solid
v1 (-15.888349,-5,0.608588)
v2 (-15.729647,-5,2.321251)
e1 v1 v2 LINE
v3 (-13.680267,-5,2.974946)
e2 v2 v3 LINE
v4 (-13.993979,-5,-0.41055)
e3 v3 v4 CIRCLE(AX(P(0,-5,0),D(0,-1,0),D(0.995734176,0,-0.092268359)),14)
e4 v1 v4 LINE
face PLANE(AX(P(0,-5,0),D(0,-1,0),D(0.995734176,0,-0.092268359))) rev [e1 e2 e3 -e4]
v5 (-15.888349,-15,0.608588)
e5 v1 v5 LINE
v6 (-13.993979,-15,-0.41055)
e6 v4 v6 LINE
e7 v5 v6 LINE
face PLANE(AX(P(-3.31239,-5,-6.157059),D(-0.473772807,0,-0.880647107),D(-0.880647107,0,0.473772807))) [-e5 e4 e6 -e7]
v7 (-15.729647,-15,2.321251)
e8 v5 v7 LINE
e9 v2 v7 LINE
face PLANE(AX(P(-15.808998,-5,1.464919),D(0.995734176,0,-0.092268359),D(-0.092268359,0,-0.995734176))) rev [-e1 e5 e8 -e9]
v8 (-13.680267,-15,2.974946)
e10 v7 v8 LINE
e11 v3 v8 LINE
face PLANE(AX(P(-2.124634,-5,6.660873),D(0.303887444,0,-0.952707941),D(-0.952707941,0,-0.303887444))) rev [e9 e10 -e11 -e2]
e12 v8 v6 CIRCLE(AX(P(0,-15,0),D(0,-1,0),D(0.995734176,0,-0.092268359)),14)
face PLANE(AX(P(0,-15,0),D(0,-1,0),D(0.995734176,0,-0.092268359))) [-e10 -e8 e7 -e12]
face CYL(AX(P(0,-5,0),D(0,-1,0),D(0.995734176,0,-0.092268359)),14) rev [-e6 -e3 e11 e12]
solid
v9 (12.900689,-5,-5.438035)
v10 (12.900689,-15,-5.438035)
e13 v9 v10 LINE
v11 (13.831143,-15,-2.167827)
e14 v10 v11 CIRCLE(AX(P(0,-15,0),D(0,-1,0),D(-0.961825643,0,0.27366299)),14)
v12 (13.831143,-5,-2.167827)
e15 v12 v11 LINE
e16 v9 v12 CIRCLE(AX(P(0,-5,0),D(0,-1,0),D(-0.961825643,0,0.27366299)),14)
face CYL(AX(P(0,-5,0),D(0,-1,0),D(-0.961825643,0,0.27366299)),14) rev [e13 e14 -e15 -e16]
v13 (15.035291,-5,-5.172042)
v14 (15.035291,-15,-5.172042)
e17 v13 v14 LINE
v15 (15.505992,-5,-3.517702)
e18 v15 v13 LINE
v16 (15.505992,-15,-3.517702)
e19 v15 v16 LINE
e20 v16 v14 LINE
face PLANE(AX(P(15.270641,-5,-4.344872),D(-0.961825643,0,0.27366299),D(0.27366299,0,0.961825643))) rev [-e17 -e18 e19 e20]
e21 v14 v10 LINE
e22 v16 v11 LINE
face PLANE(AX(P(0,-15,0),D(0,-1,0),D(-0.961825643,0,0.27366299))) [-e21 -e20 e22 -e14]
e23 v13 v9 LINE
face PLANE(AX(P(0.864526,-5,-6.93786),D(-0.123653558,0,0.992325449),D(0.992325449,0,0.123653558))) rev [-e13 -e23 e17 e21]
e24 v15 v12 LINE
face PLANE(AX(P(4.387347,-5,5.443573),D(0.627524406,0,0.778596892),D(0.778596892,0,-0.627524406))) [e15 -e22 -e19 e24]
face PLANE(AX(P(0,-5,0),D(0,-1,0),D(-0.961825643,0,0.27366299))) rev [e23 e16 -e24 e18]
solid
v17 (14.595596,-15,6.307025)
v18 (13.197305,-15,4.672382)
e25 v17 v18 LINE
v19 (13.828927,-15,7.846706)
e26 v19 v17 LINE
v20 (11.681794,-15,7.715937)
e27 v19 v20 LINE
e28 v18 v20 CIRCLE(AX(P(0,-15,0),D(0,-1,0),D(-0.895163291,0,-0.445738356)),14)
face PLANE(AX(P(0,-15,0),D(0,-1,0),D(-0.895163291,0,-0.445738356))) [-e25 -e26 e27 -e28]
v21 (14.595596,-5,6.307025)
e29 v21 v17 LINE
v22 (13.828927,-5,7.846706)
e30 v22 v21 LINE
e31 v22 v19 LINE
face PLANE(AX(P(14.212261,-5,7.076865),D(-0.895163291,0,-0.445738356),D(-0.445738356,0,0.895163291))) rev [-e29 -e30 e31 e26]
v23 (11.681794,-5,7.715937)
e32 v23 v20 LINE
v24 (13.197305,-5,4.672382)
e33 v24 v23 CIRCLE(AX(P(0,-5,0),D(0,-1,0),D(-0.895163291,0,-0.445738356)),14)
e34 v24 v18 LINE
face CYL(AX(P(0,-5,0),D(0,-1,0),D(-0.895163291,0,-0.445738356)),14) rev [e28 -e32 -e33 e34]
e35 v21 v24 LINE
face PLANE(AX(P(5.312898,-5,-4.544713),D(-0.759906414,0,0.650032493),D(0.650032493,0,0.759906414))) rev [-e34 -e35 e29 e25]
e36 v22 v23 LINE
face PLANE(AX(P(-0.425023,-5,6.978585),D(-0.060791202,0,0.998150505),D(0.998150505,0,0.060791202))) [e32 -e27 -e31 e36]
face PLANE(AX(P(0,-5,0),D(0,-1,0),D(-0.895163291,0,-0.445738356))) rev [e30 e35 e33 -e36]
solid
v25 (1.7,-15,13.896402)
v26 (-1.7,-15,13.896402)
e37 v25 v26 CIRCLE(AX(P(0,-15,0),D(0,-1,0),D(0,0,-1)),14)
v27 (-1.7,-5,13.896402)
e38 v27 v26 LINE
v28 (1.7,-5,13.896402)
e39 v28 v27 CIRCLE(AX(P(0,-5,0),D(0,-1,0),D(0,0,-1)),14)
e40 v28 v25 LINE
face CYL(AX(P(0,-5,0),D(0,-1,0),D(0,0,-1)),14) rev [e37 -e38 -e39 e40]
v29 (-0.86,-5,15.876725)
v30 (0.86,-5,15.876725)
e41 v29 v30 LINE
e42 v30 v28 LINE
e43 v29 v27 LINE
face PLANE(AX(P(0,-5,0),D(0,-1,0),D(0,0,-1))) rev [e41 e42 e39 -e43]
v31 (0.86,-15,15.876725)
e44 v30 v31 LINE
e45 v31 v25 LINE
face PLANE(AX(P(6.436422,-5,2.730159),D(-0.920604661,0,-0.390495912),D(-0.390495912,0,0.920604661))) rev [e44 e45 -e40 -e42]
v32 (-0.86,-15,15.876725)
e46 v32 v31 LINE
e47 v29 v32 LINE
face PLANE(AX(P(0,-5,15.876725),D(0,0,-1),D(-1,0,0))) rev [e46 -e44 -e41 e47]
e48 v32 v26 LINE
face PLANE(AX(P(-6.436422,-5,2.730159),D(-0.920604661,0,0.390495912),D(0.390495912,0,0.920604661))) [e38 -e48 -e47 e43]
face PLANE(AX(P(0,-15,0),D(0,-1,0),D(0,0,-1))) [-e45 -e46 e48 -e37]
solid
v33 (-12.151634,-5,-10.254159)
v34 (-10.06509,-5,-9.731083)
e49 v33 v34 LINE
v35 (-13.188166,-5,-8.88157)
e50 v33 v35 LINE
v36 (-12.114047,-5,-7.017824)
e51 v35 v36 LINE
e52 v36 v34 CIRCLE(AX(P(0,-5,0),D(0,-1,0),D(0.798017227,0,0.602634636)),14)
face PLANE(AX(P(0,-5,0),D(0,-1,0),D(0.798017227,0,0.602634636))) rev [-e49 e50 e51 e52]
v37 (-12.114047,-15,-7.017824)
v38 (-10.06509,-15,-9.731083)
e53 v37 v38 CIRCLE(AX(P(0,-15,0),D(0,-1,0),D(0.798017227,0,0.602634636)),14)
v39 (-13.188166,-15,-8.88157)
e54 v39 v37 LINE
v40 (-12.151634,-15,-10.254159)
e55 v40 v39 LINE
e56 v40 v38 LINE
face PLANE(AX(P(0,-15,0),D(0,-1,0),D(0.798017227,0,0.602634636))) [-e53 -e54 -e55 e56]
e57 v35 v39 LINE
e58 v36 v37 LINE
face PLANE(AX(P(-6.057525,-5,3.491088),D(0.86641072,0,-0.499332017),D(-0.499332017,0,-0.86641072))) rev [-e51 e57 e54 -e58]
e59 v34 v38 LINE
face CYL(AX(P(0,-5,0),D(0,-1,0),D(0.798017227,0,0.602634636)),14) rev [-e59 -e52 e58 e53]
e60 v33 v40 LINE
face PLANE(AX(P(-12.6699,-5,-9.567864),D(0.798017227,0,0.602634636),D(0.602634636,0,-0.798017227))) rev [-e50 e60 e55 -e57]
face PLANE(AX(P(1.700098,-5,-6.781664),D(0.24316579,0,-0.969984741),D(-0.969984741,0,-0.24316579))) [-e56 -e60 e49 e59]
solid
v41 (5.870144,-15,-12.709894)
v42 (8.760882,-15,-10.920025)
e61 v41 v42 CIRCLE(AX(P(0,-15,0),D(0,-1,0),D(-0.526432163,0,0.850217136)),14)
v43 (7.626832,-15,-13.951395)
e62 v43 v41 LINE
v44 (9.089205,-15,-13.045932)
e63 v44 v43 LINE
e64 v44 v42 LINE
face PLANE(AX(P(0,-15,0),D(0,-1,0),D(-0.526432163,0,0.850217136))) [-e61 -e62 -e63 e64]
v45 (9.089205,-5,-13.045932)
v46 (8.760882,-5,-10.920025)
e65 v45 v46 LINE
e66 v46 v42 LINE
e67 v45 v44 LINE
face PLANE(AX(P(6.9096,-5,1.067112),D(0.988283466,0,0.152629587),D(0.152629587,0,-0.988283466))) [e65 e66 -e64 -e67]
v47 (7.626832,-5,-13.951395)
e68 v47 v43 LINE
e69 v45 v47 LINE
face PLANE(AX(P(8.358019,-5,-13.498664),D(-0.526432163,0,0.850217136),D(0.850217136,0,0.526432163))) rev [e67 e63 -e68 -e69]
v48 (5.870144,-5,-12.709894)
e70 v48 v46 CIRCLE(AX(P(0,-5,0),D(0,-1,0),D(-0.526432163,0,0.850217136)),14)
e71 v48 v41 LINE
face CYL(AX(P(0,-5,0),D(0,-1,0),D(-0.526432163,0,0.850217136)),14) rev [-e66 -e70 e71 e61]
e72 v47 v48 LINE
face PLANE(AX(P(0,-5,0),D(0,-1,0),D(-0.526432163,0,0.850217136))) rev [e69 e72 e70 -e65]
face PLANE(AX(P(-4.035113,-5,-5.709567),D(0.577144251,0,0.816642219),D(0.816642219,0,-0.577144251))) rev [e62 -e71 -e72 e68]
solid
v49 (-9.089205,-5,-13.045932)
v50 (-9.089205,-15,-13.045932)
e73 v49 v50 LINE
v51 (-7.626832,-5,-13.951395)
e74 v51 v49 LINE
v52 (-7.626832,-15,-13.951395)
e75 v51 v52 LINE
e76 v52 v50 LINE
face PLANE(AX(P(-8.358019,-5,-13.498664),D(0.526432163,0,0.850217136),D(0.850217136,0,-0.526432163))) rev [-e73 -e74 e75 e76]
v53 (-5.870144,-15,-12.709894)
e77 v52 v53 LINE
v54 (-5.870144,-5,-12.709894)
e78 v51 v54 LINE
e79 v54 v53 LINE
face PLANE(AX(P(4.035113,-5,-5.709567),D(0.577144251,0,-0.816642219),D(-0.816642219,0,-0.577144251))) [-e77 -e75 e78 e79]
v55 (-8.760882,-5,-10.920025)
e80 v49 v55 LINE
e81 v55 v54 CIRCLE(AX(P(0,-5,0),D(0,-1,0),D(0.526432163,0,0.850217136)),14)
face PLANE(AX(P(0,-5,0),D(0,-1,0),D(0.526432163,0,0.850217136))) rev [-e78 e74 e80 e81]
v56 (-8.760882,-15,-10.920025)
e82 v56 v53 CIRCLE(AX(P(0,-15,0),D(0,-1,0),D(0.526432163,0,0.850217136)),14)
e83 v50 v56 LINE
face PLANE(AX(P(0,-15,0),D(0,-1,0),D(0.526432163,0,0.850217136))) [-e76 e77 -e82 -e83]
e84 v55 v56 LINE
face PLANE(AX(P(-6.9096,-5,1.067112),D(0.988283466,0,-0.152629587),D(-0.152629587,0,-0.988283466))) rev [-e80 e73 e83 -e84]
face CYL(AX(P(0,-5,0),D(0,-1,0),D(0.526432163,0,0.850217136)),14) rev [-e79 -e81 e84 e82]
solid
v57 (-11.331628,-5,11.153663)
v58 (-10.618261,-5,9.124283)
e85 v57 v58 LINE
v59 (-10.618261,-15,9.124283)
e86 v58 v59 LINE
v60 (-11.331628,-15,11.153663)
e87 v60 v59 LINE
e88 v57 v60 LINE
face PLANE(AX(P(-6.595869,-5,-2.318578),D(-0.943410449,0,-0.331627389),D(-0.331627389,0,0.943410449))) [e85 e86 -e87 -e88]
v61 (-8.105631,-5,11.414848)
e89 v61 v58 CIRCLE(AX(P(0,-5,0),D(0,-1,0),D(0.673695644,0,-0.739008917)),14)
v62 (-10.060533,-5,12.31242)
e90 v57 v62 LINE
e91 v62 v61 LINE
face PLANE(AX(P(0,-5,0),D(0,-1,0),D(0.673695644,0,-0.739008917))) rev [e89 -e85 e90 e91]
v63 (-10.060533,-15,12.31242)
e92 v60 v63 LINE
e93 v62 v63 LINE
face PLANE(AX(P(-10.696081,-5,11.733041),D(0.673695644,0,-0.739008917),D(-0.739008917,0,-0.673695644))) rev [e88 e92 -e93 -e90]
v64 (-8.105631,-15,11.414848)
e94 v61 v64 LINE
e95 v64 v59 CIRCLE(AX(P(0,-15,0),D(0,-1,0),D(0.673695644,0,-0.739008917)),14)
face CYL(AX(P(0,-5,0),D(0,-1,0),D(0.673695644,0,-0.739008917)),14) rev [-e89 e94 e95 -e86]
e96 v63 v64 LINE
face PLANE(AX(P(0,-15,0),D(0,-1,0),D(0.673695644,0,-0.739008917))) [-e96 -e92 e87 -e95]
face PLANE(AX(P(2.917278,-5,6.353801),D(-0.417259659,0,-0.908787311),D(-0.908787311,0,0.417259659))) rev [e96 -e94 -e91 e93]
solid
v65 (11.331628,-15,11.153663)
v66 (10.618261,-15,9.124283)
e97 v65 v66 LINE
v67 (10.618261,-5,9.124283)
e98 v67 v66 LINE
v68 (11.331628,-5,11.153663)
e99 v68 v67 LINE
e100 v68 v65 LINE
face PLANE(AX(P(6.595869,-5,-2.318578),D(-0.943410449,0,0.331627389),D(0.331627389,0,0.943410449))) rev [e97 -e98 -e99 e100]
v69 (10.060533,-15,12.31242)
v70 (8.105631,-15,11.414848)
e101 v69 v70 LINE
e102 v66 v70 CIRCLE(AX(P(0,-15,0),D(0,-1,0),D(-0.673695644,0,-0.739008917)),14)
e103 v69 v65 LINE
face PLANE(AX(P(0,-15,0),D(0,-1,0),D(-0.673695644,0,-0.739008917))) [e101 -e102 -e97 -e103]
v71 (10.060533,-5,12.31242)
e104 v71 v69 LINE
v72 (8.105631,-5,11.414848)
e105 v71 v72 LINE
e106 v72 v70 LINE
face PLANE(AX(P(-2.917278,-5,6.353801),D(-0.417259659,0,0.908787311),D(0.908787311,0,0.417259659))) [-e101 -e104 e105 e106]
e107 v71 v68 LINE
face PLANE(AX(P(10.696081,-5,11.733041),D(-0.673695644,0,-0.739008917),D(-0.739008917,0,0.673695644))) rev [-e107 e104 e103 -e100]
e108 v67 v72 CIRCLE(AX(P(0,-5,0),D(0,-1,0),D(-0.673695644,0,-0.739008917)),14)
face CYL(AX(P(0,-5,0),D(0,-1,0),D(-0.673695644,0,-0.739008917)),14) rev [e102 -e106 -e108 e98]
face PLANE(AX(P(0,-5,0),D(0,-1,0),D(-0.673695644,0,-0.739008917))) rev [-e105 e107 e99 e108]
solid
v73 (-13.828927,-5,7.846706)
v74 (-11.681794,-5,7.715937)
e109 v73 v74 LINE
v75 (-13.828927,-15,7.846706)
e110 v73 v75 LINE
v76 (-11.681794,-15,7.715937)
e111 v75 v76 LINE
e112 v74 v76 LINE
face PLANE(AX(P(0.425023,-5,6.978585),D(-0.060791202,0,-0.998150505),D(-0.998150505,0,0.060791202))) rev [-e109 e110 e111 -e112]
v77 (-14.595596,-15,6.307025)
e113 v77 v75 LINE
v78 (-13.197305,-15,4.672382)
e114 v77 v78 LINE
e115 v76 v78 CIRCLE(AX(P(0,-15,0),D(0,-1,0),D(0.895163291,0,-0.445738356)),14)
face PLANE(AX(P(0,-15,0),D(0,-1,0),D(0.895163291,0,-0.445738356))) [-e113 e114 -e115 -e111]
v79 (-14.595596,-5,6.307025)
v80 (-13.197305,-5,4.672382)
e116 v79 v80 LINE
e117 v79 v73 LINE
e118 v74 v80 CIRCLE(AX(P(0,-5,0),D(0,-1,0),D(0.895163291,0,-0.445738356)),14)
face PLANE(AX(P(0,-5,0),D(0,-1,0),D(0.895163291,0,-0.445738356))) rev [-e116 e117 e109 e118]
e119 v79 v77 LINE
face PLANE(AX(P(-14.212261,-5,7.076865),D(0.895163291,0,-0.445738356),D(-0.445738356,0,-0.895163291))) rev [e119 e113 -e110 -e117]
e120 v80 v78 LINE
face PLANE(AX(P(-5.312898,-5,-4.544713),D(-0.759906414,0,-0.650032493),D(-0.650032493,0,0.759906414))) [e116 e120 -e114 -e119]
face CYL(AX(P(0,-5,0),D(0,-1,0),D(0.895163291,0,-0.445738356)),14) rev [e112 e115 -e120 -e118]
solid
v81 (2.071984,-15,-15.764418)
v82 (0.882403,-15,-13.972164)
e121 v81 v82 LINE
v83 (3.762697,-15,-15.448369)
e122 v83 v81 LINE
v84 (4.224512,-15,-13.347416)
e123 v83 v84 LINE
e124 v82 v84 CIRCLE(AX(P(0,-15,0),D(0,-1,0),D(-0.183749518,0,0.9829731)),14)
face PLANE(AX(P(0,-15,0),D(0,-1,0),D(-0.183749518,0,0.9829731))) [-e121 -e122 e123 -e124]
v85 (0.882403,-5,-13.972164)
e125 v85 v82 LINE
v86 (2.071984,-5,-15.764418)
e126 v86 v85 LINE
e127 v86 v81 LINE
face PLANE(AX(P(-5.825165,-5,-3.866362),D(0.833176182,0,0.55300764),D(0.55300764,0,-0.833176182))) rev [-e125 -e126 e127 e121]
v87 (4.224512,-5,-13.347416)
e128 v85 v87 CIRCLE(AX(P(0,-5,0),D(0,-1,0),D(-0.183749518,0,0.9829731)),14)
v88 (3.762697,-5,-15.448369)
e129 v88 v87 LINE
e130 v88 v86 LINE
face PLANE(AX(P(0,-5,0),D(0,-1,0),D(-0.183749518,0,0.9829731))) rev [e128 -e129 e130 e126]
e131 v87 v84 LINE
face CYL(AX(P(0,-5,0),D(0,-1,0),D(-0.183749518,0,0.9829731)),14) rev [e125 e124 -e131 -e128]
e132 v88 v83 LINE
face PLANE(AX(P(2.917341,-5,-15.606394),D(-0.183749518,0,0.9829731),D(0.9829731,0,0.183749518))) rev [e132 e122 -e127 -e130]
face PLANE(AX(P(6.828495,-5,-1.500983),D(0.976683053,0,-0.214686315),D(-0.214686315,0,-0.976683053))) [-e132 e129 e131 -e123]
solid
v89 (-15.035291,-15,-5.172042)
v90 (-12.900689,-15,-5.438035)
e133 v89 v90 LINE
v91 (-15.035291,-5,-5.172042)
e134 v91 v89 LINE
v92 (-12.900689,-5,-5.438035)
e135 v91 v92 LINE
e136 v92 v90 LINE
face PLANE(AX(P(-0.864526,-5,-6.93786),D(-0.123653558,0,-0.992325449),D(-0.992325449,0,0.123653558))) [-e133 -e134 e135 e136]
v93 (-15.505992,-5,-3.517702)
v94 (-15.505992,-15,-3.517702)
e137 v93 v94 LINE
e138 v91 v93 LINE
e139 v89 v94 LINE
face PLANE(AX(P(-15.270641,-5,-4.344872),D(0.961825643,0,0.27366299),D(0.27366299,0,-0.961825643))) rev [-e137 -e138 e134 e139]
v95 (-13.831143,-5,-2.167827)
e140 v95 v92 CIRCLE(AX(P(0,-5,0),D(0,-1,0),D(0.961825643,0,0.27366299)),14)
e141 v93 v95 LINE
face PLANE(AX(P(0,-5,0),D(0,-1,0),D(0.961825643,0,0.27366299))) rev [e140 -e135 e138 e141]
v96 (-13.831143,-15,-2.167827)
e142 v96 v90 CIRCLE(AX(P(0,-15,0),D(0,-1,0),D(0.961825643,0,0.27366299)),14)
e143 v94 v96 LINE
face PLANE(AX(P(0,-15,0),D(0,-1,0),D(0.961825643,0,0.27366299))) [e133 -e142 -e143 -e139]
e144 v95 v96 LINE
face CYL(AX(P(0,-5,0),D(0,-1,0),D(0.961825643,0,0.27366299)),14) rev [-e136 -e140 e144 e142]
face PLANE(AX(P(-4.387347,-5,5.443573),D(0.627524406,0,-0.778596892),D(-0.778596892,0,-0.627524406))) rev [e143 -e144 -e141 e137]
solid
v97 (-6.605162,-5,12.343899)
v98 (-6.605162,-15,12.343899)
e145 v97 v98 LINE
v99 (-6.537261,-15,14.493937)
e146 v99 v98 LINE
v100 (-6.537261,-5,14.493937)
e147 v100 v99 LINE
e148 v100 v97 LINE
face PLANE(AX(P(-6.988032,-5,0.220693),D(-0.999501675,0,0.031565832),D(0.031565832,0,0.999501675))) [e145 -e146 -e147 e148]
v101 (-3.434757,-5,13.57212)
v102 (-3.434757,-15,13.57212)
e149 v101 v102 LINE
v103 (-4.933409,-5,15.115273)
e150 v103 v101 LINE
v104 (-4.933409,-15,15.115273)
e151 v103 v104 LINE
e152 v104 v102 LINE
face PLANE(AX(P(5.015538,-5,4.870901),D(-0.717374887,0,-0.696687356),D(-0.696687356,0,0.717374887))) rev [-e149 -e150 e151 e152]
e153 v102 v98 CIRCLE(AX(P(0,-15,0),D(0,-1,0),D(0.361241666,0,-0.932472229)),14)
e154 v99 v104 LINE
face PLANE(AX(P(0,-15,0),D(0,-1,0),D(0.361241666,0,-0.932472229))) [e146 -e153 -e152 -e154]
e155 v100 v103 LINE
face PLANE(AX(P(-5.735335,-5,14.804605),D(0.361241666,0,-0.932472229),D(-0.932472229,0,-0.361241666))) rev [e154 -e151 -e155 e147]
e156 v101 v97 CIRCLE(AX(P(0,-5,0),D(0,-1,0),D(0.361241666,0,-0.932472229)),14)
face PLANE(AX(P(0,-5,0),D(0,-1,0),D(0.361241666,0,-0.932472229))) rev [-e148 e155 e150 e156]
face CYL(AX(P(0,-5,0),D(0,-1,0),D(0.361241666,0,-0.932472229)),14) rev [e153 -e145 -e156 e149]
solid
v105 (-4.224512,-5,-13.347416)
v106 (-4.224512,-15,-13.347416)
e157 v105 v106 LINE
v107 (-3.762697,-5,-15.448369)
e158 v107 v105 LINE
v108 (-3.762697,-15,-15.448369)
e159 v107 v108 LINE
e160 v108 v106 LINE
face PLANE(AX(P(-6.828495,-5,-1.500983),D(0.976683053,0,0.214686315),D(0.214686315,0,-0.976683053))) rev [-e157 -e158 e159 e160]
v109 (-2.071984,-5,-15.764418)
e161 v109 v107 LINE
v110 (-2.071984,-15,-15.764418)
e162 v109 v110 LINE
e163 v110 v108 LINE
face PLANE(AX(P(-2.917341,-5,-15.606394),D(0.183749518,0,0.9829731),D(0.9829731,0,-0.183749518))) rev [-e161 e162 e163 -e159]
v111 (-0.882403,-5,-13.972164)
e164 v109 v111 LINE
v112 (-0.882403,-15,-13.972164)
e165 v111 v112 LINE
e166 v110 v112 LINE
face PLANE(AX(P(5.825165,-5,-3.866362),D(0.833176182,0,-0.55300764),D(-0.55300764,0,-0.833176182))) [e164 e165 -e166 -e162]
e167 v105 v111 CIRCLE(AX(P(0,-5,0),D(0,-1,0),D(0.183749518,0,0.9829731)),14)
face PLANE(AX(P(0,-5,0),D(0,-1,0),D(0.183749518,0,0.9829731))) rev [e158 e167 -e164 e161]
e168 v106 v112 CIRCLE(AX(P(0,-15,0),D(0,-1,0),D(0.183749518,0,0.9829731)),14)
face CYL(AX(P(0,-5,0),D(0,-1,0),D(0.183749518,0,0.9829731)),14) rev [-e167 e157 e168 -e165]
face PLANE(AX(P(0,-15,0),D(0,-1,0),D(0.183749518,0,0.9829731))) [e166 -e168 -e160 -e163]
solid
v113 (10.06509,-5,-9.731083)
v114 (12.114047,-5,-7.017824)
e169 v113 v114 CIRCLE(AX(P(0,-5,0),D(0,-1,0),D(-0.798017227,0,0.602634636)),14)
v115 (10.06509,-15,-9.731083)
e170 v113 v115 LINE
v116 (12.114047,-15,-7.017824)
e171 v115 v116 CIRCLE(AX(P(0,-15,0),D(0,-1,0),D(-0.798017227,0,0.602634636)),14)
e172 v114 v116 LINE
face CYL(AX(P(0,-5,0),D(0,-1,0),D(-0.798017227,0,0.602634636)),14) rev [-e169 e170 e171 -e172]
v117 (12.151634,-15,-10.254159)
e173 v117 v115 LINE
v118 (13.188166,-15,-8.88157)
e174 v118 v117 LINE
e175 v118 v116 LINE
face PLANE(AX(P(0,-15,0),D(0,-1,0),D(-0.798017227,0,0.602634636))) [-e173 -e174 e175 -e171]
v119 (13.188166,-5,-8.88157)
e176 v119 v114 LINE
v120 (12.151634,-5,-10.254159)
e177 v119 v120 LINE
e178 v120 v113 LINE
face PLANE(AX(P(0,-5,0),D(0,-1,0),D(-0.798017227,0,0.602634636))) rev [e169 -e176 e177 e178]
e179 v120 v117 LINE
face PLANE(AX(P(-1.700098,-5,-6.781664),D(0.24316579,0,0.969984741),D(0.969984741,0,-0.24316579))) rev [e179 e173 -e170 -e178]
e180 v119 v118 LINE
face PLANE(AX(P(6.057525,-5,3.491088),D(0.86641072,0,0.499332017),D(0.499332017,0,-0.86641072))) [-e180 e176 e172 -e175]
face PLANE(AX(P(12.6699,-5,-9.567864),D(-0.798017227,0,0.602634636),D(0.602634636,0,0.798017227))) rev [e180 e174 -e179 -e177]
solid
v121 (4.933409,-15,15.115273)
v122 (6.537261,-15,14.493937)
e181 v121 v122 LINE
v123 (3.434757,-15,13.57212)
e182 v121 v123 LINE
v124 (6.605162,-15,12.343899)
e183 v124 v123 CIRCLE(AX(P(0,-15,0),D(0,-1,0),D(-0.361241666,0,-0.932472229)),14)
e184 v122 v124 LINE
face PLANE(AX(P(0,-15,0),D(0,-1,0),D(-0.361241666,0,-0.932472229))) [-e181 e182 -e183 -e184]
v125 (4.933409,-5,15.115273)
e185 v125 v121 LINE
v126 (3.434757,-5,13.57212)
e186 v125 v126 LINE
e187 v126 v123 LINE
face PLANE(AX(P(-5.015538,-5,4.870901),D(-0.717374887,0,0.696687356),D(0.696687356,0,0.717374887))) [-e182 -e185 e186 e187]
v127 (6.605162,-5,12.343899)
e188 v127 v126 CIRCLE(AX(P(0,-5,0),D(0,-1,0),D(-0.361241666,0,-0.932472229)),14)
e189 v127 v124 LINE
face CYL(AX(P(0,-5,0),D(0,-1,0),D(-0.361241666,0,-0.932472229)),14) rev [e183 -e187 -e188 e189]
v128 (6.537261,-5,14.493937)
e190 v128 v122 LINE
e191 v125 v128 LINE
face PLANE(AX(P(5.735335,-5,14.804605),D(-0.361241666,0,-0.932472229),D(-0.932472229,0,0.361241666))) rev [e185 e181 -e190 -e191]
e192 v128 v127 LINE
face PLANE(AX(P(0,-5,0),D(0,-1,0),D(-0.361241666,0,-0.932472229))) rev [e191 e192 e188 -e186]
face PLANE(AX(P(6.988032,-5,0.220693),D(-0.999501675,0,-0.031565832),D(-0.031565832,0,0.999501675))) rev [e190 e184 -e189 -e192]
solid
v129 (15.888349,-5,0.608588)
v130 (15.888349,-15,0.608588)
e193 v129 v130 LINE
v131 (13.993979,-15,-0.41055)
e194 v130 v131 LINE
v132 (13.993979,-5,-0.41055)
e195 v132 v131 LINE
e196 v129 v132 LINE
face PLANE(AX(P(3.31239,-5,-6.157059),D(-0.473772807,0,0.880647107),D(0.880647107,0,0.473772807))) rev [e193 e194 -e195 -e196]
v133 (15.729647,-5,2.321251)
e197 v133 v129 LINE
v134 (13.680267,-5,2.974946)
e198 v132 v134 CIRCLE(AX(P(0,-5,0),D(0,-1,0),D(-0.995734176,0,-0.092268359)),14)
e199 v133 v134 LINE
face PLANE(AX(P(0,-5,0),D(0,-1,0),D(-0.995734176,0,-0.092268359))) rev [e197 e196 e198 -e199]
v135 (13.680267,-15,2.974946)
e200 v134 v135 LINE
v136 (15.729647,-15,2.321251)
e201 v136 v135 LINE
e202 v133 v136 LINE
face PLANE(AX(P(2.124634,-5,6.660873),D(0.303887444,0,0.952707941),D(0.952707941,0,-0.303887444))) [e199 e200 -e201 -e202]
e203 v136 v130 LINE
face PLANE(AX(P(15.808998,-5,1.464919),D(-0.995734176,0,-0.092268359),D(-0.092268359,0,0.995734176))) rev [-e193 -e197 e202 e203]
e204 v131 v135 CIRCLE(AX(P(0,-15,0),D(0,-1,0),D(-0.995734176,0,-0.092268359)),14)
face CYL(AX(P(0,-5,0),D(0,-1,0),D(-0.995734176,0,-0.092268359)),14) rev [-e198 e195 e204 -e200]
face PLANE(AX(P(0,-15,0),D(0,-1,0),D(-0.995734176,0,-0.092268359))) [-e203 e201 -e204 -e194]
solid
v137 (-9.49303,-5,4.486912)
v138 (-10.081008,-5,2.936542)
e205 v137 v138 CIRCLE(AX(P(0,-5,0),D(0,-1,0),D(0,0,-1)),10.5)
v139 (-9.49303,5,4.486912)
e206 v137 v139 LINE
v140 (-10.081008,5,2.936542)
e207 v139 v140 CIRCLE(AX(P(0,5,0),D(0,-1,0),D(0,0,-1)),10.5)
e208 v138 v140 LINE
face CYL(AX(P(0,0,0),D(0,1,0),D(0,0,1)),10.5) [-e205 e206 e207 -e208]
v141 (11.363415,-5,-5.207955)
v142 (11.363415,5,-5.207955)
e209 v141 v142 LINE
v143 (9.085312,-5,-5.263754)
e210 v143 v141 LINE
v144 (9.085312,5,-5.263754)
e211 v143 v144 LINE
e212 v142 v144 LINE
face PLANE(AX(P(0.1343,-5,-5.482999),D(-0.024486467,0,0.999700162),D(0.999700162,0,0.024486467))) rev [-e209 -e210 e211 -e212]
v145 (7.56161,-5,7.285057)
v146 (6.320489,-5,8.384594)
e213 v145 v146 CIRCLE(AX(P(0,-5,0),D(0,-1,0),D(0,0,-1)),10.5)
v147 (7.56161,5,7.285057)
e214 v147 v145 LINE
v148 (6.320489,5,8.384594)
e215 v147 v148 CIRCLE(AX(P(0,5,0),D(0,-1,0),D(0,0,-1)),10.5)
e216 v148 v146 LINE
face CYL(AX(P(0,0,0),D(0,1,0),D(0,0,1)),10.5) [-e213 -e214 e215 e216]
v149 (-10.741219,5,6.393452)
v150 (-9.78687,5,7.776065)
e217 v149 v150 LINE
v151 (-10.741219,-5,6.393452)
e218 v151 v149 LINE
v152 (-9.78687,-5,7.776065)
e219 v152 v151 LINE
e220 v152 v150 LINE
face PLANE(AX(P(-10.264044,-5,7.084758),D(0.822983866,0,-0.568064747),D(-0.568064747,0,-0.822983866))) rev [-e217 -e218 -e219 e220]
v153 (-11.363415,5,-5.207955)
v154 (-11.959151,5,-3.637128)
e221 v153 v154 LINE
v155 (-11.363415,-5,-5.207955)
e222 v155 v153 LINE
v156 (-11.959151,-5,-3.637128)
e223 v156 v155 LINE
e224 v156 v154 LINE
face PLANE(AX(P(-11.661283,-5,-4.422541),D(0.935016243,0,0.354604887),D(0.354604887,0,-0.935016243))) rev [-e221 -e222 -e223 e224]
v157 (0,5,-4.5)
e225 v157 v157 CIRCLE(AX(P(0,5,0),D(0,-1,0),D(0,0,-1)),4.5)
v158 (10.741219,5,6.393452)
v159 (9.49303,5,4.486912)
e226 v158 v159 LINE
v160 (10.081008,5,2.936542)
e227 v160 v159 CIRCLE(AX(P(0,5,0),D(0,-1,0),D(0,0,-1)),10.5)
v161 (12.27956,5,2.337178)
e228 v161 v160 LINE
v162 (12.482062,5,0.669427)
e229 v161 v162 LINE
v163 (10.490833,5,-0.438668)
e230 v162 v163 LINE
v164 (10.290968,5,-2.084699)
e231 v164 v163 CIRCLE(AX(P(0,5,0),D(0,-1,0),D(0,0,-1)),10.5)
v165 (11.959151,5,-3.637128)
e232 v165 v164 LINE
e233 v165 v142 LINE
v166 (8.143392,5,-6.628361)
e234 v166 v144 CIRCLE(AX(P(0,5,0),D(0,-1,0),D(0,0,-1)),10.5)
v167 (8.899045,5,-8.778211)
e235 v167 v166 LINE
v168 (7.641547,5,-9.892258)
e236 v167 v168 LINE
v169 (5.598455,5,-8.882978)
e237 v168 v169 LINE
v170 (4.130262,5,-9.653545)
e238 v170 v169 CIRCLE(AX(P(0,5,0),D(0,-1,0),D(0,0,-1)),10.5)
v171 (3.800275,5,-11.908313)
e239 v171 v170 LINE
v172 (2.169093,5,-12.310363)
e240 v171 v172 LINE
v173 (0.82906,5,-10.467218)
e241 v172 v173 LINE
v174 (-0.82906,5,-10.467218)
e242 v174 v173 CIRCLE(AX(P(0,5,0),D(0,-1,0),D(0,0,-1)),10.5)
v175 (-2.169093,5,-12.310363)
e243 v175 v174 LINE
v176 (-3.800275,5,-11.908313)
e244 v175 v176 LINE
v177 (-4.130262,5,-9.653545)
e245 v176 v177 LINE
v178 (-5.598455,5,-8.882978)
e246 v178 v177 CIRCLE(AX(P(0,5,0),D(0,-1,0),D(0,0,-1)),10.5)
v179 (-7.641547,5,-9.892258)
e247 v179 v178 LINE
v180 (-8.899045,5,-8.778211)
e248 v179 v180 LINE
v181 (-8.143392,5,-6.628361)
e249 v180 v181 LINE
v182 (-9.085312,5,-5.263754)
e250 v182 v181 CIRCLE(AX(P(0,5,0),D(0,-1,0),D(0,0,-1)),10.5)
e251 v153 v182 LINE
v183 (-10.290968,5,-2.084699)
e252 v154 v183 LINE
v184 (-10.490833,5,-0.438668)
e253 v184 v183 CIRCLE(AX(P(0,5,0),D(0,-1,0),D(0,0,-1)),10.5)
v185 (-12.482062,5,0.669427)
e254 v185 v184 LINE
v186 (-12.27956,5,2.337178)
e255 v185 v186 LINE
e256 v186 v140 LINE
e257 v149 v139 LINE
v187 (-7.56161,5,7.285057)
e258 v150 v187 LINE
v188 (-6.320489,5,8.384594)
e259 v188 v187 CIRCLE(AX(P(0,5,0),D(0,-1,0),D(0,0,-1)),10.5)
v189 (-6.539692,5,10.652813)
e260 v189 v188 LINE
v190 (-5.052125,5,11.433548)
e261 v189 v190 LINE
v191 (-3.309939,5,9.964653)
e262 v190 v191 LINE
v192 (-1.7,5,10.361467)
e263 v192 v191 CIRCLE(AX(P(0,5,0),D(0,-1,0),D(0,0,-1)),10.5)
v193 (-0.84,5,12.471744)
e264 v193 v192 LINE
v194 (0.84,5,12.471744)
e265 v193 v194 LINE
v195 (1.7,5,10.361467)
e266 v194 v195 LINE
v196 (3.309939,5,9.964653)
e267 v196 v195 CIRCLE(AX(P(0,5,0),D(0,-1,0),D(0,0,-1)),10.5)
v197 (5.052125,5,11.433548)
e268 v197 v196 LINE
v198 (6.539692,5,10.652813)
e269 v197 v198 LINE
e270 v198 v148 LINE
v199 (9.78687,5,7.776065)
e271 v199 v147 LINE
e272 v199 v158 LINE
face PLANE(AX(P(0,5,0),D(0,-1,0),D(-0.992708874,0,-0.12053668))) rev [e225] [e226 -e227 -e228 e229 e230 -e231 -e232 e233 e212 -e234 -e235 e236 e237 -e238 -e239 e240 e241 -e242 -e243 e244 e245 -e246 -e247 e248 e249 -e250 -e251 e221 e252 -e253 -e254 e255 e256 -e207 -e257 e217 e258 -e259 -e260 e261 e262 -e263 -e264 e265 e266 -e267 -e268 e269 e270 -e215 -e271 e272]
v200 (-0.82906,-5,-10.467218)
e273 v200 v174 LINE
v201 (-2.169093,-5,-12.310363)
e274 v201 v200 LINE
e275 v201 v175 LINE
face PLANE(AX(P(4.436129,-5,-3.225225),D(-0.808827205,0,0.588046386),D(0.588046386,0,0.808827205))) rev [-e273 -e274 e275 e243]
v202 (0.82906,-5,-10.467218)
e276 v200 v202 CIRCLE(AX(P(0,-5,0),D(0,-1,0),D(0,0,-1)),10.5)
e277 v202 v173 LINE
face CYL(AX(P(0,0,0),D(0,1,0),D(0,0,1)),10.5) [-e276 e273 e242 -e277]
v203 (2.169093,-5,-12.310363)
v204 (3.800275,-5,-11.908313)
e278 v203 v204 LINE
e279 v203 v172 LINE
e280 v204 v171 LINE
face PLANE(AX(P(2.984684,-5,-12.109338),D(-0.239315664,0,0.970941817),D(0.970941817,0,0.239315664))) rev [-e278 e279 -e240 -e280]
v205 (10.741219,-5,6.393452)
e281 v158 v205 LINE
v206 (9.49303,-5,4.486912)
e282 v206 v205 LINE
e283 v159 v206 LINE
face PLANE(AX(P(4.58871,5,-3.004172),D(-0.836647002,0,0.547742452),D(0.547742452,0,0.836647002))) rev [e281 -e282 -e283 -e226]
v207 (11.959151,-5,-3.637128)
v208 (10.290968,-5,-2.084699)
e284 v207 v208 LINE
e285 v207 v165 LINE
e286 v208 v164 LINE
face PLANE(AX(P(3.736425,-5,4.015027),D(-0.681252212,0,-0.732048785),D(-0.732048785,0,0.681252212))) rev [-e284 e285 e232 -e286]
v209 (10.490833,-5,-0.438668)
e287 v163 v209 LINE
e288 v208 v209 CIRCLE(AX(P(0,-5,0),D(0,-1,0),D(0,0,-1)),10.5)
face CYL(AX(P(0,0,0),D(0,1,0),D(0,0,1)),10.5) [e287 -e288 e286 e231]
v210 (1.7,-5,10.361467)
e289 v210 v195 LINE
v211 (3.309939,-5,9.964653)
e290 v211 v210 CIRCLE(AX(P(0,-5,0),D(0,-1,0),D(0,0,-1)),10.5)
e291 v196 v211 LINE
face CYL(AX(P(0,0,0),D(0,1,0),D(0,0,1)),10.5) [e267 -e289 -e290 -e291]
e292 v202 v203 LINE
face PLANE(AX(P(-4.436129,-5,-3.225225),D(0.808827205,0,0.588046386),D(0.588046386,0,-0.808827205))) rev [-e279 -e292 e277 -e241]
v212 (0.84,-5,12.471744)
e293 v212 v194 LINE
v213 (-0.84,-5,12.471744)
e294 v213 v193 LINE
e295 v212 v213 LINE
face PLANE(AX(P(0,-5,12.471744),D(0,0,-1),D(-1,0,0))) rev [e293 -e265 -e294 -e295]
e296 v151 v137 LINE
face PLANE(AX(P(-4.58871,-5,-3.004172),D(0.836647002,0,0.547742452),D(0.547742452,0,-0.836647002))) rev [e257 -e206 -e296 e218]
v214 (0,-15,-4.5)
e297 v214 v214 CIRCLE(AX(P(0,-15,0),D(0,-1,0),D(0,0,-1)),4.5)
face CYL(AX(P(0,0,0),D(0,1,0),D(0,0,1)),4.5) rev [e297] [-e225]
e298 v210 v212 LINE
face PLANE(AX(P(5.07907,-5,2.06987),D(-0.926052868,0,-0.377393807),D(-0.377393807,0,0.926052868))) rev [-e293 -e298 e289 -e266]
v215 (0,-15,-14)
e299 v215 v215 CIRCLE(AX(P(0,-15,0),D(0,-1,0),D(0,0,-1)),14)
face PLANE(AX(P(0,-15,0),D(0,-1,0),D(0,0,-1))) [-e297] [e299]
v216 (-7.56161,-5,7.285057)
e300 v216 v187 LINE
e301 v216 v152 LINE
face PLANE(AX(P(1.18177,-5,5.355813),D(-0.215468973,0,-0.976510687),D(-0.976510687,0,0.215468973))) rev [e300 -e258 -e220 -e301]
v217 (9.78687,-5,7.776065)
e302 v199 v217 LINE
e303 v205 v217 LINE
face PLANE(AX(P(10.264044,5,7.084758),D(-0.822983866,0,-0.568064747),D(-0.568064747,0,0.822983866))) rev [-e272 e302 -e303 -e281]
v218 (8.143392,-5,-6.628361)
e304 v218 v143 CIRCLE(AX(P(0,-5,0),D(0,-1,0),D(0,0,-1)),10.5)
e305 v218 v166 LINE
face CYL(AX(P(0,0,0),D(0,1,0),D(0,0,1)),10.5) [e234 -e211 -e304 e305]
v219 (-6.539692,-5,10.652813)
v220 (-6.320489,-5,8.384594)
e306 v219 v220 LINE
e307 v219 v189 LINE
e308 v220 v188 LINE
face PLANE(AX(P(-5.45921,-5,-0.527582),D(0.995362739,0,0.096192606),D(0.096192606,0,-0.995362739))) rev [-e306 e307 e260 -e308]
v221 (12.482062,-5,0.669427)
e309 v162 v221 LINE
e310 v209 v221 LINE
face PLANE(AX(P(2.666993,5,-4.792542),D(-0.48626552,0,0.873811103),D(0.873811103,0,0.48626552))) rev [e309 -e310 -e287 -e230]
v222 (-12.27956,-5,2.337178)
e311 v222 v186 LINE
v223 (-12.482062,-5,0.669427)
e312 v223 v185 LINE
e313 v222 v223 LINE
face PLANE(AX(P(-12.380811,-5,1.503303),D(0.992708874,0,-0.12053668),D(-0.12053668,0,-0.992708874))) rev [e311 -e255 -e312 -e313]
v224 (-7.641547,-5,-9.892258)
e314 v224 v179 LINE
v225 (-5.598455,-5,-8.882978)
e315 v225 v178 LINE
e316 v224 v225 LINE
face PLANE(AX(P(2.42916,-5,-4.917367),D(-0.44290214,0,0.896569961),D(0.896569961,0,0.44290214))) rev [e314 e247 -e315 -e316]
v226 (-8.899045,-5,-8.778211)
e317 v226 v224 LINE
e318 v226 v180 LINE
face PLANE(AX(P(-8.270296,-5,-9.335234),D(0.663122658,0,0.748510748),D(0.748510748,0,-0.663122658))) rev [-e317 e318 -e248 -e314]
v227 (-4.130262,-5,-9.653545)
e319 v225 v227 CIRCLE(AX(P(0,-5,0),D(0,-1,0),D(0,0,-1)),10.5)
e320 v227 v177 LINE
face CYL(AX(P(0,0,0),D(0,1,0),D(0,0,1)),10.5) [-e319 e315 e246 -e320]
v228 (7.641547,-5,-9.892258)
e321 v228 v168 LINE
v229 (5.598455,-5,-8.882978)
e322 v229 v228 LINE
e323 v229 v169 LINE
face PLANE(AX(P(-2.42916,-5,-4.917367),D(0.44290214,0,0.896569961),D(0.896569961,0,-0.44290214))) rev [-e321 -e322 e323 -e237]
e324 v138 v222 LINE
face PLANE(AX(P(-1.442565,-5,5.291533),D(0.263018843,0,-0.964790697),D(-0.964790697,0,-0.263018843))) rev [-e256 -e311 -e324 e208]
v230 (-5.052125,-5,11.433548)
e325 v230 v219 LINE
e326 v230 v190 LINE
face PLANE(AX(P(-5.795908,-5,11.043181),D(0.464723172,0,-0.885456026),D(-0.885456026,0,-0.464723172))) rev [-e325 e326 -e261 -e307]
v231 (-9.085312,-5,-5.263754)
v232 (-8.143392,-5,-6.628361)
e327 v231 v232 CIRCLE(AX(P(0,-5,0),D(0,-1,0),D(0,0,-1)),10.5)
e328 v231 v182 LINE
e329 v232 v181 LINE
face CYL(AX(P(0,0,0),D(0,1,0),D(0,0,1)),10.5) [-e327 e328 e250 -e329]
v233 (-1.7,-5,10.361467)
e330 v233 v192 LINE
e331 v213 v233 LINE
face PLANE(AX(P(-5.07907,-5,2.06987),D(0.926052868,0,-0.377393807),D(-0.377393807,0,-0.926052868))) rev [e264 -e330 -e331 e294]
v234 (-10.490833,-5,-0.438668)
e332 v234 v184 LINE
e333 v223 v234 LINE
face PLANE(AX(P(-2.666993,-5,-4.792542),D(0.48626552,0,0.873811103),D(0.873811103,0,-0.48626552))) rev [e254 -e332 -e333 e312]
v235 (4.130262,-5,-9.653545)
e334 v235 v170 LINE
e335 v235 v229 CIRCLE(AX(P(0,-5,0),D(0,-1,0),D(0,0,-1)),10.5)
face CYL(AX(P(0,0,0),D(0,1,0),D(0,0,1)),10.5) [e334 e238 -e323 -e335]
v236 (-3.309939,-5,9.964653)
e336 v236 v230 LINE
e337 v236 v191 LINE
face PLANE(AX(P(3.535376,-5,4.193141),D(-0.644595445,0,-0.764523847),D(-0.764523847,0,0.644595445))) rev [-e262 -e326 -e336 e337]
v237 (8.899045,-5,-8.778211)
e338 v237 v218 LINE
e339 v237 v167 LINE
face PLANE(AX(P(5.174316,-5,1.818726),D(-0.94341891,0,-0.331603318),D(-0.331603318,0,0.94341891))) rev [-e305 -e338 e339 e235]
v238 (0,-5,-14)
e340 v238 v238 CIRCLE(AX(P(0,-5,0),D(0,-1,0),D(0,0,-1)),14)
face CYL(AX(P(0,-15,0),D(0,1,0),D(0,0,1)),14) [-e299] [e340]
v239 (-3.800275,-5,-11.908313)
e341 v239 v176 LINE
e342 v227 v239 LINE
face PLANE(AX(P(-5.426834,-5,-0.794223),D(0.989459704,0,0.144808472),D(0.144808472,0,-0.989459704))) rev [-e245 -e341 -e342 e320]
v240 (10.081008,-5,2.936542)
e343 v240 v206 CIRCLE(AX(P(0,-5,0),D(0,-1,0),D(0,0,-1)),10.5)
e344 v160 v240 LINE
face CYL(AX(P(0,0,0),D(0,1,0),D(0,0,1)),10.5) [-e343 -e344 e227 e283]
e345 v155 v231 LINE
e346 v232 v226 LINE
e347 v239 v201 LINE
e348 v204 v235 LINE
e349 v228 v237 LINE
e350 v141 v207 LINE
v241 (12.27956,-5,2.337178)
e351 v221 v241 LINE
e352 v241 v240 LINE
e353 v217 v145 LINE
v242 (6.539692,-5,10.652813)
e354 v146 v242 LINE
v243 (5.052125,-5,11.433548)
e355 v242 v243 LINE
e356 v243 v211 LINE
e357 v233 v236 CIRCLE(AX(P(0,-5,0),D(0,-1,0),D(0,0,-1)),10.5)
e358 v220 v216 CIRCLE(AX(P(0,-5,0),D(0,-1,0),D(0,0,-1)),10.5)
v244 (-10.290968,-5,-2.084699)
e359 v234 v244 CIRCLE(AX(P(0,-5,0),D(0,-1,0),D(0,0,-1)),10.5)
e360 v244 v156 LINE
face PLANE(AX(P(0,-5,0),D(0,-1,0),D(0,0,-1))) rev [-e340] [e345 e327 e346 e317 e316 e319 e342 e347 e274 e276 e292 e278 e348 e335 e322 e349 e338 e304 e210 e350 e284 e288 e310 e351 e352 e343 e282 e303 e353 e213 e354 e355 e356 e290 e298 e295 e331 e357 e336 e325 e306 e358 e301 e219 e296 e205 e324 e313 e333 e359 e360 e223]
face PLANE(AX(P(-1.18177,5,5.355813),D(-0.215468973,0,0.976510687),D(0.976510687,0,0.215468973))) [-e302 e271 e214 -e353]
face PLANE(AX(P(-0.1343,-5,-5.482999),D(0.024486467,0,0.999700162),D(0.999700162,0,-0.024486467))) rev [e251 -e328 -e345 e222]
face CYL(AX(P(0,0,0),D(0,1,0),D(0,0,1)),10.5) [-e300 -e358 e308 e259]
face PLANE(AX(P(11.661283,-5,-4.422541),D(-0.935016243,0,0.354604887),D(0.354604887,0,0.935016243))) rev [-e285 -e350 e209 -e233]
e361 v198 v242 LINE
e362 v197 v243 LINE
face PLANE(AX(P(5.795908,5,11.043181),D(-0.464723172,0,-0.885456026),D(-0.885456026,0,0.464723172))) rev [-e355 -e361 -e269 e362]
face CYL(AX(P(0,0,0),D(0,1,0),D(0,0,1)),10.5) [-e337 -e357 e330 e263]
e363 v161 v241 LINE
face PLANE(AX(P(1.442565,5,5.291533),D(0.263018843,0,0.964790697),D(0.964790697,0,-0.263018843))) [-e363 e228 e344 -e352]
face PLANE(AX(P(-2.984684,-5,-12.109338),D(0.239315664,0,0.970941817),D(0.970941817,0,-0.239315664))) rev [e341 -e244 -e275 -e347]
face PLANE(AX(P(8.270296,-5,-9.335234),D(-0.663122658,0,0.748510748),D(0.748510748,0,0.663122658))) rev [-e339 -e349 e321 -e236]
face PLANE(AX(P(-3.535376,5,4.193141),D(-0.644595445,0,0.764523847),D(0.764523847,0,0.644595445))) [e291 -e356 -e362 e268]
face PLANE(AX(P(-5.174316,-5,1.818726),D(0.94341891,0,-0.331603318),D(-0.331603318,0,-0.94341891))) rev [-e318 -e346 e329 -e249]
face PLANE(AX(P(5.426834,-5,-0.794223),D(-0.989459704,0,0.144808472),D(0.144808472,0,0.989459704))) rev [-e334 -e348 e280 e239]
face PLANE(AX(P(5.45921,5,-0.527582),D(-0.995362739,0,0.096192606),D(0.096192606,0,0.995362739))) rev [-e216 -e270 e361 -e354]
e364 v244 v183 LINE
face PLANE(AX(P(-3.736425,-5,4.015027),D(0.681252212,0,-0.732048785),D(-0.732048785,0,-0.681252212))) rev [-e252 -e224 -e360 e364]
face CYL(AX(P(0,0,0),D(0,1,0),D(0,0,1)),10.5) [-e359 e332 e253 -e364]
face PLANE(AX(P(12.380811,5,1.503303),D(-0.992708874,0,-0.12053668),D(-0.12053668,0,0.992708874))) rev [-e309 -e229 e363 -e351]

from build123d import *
from build123d.topology import SkipClean

# Parameters (mm, degrees)
SKETCH1_R            = 4.5
BOSS_EXTRUDE1_DEPTH  = 5
SKETCH12_R           = 10.5
SKETCH12_R_2         = 4.5
BOSS_EXTRUDE6_DEPTH  = 5
BOSS_EXTRUDE9_DEPTH  = 5
CIRPATTERN2_COUNT    = 13
BOSS_EXTRUDE10_START = 5
SKETCH17_R           = 10.5
SKETCH17_R_2         = 4.5
BOSS_EXTRUDE10_DEPTH = 5
BOSS_EXTRUDE11_START = 10
SKETCH20_R           = 14
SKETCH20_R_2         = 4.5
BOSS_EXTRUDE11_DEPTH = 10
BOSS_EXTRUDE12_DEPTH = 10
CIRPATTERN3_COUNT    = 17
BOSS_EXTRUDE13_DEPTH = 5
SKETCH27_R           = 4.5
CUT_EXTRUDE3_DEPTH   = 10


with BuildPart() as part:
    # Sketch1 → Boss-Extrude1 (new body)
    with BuildSketch(Plane(origin=(0, 0, 0), x_dir=(1, 0, 0), z_dir=(0, 1, 0))):
        with Locations(Location((0, 0, 0), (0, 0, 270))):
            Circle(SKETCH1_R)
    extrude(amount=BOSS_EXTRUDE1_DEPTH)

    # Sketch27 → Cut-Extrude3 (cut)
    with BuildSketch(Plane.XZ):
        with Locations(Location((0, 0, 0), (0, 0, 270))):
            Circle(SKETCH27_R)
    extrude(amount=-CUT_EXTRUDE3_DEPTH, mode=Mode.SUBTRACT)


with BuildPart() as body_2:
    # Sketch12 → Boss-Extrude6 (new body)
    with BuildSketch(Plane(origin=(0, 5, 0), x_dir=(-1, 0, 0), z_dir=(0, -1, 0))):
        with Locations(Location((0, 0, 0), (0, 0, 90))):
            Circle(SKETCH12_R)
        with Locations(Location((0, 0, 0), (0, 0, 270))):
            Circle(SKETCH12_R_2, mode=Mode.SUBTRACT)
    extrude(amount=BOSS_EXTRUDE6_DEPTH)



with BuildPart() as body_3:
    # Sketch13 → Boss-Extrude9 (new body)
    with BuildSketch(Plane.XZ):
        with BuildLine():
            Line((1.7, 10.361467078), (0.84, 12.471744064))
            Line((0.84, 12.471744064), (-0.84, 12.471744064))
            Line((-0.84, 12.471744064), (-1.7, 10.361467078))
            ThreePointArc((-1.7, 10.361467078), (0, 10.5), (1.7, 10.361467078))
        make_face()
    extrude(amount=-BOSS_EXTRUDE9_DEPTH)


with BuildPart() as cirpattern2_1:
    # CirPattern2: pattern copy
    add(body_3.part.rotate(Axis((0, 0, 0), (0, 1, 0)), 1 * 360 / CIRPATTERN2_COUNT))


with BuildPart() as cirpattern2_2:
    # CirPattern2: pattern copy
    add(body_3.part.rotate(Axis((0, 0, 0), (0, 1, 0)), 2 * 360 / CIRPATTERN2_COUNT))


with BuildPart() as cirpattern2_3:
    # CirPattern2: pattern copy
    add(body_3.part.rotate(Axis((0, 0, 0), (0, 1, 0)), 3 * 360 / CIRPATTERN2_COUNT))


with BuildPart() as cirpattern2_4:
    # CirPattern2: pattern copy
    add(body_3.part.rotate(Axis((0, 0, 0), (0, 1, 0)), 4 * 360 / CIRPATTERN2_COUNT))


with BuildPart() as cirpattern2_5:
    # CirPattern2: pattern copy
    add(body_3.part.rotate(Axis((0, 0, 0), (0, 1, 0)), 5 * 360 / CIRPATTERN2_COUNT))


with BuildPart() as cirpattern2_6:
    # CirPattern2: pattern copy
    add(body_3.part.rotate(Axis((0, 0, 0), (0, 1, 0)), 6 * 360 / CIRPATTERN2_COUNT))


with BuildPart() as cirpattern2_7:
    # CirPattern2: pattern copy
    add(body_3.part.rotate(Axis((0, 0, 0), (0, 1, 0)), 7 * 360 / CIRPATTERN2_COUNT))


with BuildPart() as cirpattern2_8:
    # CirPattern2: pattern copy
    add(body_3.part.rotate(Axis((0, 0, 0), (0, 1, 0)), 8 * 360 / CIRPATTERN2_COUNT))


with BuildPart() as cirpattern2_9:
    # CirPattern2: pattern copy
    add(body_3.part.rotate(Axis((0, 0, 0), (0, 1, 0)), 9 * 360 / CIRPATTERN2_COUNT))


with BuildPart() as cirpattern2_10:
    # CirPattern2: pattern copy
    add(body_3.part.rotate(Axis((0, 0, 0), (0, 1, 0)), 10 * 360 / CIRPATTERN2_COUNT))


with BuildPart() as cirpattern2_11:
    # CirPattern2: pattern copy
    add(body_3.part.rotate(Axis((0, 0, 0), (0, 1, 0)), 11 * 360 / CIRPATTERN2_COUNT))


with BuildPart() as cirpattern2_12:
    # CirPattern2: pattern copy
    add(body_3.part.rotate(Axis((0, 0, 0), (0, 1, 0)), 12 * 360 / CIRPATTERN2_COUNT))


with BuildPart() as body_2_1:
    with SkipClean():  # the faces are left unmerged after this step: merging them gives an invalid solid
        add(body_2.part)

        add(body_3.part)  # Boss-Extrude10 merges body 3

        add(cirpattern2_4.part)  # Boss-Extrude10 merges CirPattern2_4

        add(cirpattern2_5.part)  # Boss-Extrude10 merges CirPattern2_5

        add(cirpattern2_6.part)  # Boss-Extrude10 merges CirPattern2_6

        add(cirpattern2_7.part)  # Boss-Extrude10 merges CirPattern2_7

        add(cirpattern2_8.part)  # Boss-Extrude10 merges CirPattern2_8

        add(cirpattern2_9.part)  # Boss-Extrude10 merges CirPattern2_9

        add(cirpattern2_10.part)  # Boss-Extrude10 merges CirPattern2_10

        add(cirpattern2_11.part)  # Boss-Extrude10 merges CirPattern2_11

        add(cirpattern2_12.part)  # Boss-Extrude10 merges CirPattern2_12
        # Sketch17 → Boss-Extrude10 (add)
        # profile 1 of 11: a face of its own
        with BuildSketch(Plane.XZ.offset(BOSS_EXTRUDE10_START)):
            Circle(SKETCH17_R)
            with Locations(Location((0, 0, 0), (0, 0, 90))):
                Circle(SKETCH17_R_2, mode=Mode.SUBTRACT)
        # profile 2 of 11: a face of its own
        with BuildSketch(Plane.XZ.offset(BOSS_EXTRUDE10_START)):
            with BuildLine():
                ThreePointArc((-1.7, 10.361467078), (0, 10.5), (1.7, 10.361467078))
                Line((1.7, 10.361467078), (0.84, 12.471744064))
                Line((0.84, 12.471744064), (-0.84, 12.471744064))
                Line((-0.84, 12.471744064), (-1.7, 10.361467078))
            make_face()
        # profile 3 of 11: a face of its own
        with BuildSketch(Plane.XZ.offset(BOSS_EXTRUDE10_START)):
            with BuildLine():
                ThreePointArc((-6.320489091, 8.384594066), (-4.879593306, 9.297288269), (-3.309938604, 9.964652851))
                Line((-3.309938604, 9.964652851), (-5.052125401, 11.433548396))
                Line((-5.052125401, 11.433548396), (-6.539691524, 10.652813467))
                Line((-6.539691524, 10.652813467), (-6.320489091, 8.384594066))
            make_face()
        # profile 4 of 11: a face of its own
        with BuildSketch(Plane.XZ.offset(BOSS_EXTRUDE10_START)):
            with BuildLine():
                Line((-10.741218532, 6.393451686), (-9.493030301, 4.486911599))
                ThreePointArc((-9.493030301, 4.486911599), (-8.641330592, 5.964679841), (-7.561610162, 7.285056743))
                Line((-7.561610162, 7.285056743), (-9.786869757, 7.77606458))
                Line((-9.786869757, 7.77606458), (-10.741218532, 6.393451686))
            make_face()
        # profile 5 of 11: a face of its own
        with BuildSketch(Plane.XZ.offset(BOSS_EXTRUDE10_START)):
            with BuildLine():
                Line((-12.482061819, 0.669427172), (-10.490832673, -0.438668242))
                ThreePointArc((-10.490832673, -0.438668242), (-10.423443178, 1.265635143), (-10.08100796, 2.93654193))
                Line((-10.08100796, 2.93654193), (-12.279560196, 2.337178081))
                Line((-12.279560196, 2.337178081), (-12.482061819, 0.669427172))
            make_face()
        # profile 6 of 11: a face of its own
        with BuildSketch(Plane.XZ.offset(BOSS_EXTRUDE10_START)):
            with BuildLine():
                Line((-11.363415169, -5.207955039), (-9.085311708, -5.263754475))
                ThreePointArc((-9.085311708, -5.263754475), (-9.817670548, -3.723351314), (-10.290968324, -2.08469925))
                Line((-10.290968324, -2.08469925), (-11.95915138, -3.637127751))
                Line((-11.95915138, -3.637127751), (-11.363415169, -5.207955039))
            make_face()
        # profile 7 of 11: a face of its own
        with BuildSketch(Plane.XZ.offset(BOSS_EXTRUDE10_START)):
            with BuildLine():
                Line((-7.641547048, -9.892257513), (-5.59845532, -8.882977993))
                ThreePointArc((-5.59845532, -8.882977993), (-6.962787912, -7.859362856), (-8.143391864, -6.628360955))
                Line((-8.143391864, -6.628360955), (-8.899045105, -8.778211447))
                Line((-8.899045105, -8.778211447), (-7.641547048, -9.892257513))
            make_face()
        # profile 8 of 11: a face of its own
        with BuildSketch(Plane.XZ.offset(BOSS_EXTRUDE10_START)):
            with BuildLine():
                Line((-2.169092589, -12.310363006), (-0.829060287, -10.467218305))
                ThreePointArc((-0.829060287, -10.467218305), (-2.512814475, -10.194889083), (-4.130262466, -9.653545046))
                Line((-4.130262466, -9.653545046), (-3.800274842, -11.90831269))
                Line((-3.800274842, -11.90831269), (-2.169092589, -12.310363006))
            make_face()
        # profile 9 of 11: a face of its own
        with BuildSketch(Plane.XZ.offset(BOSS_EXTRUDE10_START)):
            with BuildLine():
                Line((0.829060287, -10.467218305), (2.169092589, -12.310363006))
                Line((2.169092589, -12.310363006), (3.800274842, -11.90831269))
                Line((3.800274842, -11.90831269), (4.130262466, -9.653545046))
                ThreePointArc((4.130262466, -9.653545046), (2.512814475, -10.194889083), (0.829060287, -10.467218305))
            make_face()
        # profile 10 of 11: a face of its own
        with BuildSketch(Plane.XZ.offset(BOSS_EXTRUDE10_START)):
            with BuildLine():
                ThreePointArc((8.143391864, -6.628360955), (6.962787912, -7.859362856), (5.59845532, -8.882977993))
                Line((5.59845532, -8.882977993), (7.641547048, -9.892257513))
                Line((7.641547048, -9.892257513), (8.899045105, -8.778211447))
                Line((8.899045105, -8.778211447), (8.143391864, -6.628360955))
            make_face()
        # profile 11 of 11: a face of its own
        with BuildSketch(Plane.XZ.offset(BOSS_EXTRUDE10_START)):
            with BuildLine():
                ThreePointArc((10.290968324, -2.08469925), (9.817670548, -3.723351314), (9.085311708, -5.263754475))
                Line((9.085311708, -5.263754475), (11.363415169, -5.207955039))
                Line((11.363415169, -5.207955039), (11.95915138, -3.637127751))
                Line((11.95915138, -3.637127751), (10.290968324, -2.08469925))
            make_face()
        extrude(amount=-BOSS_EXTRUDE10_DEPTH)

    # Sketch20 → Boss-Extrude11 (add)
    with SkipClean():  # the faces are left unmerged after this step: merging them gives an invalid solid
        with BuildSketch(Plane.XZ.offset(5).offset(BOSS_EXTRUDE11_START)):
            with Locations(Location((0, 0, 0), (0, 0, 270))):
                Circle(SKETCH20_R)
            with Locations(Location((0, 0, 0), (0, 0, 90))):
                Circle(SKETCH20_R_2, mode=Mode.SUBTRACT)
        extrude(amount=-BOSS_EXTRUDE11_DEPTH)
    add(body_2_1.part.scale(1), mode=Mode.REPLACE)  # the faces are merged on a copy


    add(cirpattern2_1.part)  # Boss-Extrude13 merges CirPattern2_1

    add(cirpattern2_2.part)  # Boss-Extrude13 merges CirPattern2_2

    add(cirpattern2_3.part)  # Boss-Extrude13 merges CirPattern2_3
    # Sketch25 → Boss-Extrude13 (add)
    with BuildSketch(Plane.XZ):
        with BuildLine():
            Line((6.320489091, 8.384594066), (6.539691524, 10.652813467))
            Line((6.539691524, 10.652813467), (5.052125401, 11.433548396))
            Line((5.052125401, 11.433548396), (3.309938604, 9.964652851))
            ThreePointArc((3.309938604, 9.964652851), (4.879593306, 9.297288269), (6.320489091, 8.384594066))
        make_face()
        with BuildLine():
            Line((9.493030301, 4.486911599), (10.741218532, 6.393451686))
            Line((10.741218532, 6.393451686), (9.786869757, 7.77606458))
            Line((9.786869757, 7.77606458), (7.561610162, 7.285056743))
            ThreePointArc((7.561610162, 7.285056743), (8.641330592, 5.964679841), (9.493030301, 4.486911599))
        make_face()
        with BuildLine():
            Line((10.490832673, -0.438668242), (12.482061819, 0.669427172))
            Line((12.482061819, 0.669427172), (12.279560196, 2.337178081))
            Line((12.279560196, 2.337178081), (10.08100796, 2.93654193))
            ThreePointArc((10.08100796, 2.93654193), (10.423443178, 1.265635143), (10.490832673, -0.438668242))
        make_face()
    extrude(amount=BOSS_EXTRUDE13_DEPTH)


with BuildPart() as body_6:
    # Sketch21 → Boss-Extrude12 (new body)
    with BuildSketch(Plane.XZ.offset(15)):
        with BuildLine():
            Line((1.7, 13.896402412), (0.86, 15.876725103))
            Line((0.86, 15.876725103), (-0.86, 15.876725103))
            Line((-0.86, 15.876725103), (-1.7, 13.896402412))
            ThreePointArc((-1.7, 13.896402412), (0, 14), (1.7, 13.896402412))
        make_face()
    extrude(amount=-BOSS_EXTRUDE12_DEPTH)


with BuildPart() as cirpattern3_1:
    # CirPattern3: pattern copy
    add(body_6.part.rotate(Axis((0, 0, 0), (0, 1, 0)), 1 * 360 / CIRPATTERN3_COUNT))


with BuildPart() as cirpattern3_2:
    # CirPattern3: pattern copy
    add(body_6.part.rotate(Axis((0, 0, 0), (0, 1, 0)), 2 * 360 / CIRPATTERN3_COUNT))


with BuildPart() as cirpattern3_3:
    # CirPattern3: pattern copy
    add(body_6.part.rotate(Axis((0, 0, 0), (0, 1, 0)), 3 * 360 / CIRPATTERN3_COUNT))


with BuildPart() as cirpattern3_4:
    # CirPattern3: pattern copy
    add(body_6.part.rotate(Axis((0, 0, 0), (0, 1, 0)), 4 * 360 / CIRPATTERN3_COUNT))


with BuildPart() as cirpattern3_5:
    # CirPattern3: pattern copy
    add(body_6.part.rotate(Axis((0, 0, 0), (0, 1, 0)), 5 * 360 / CIRPATTERN3_COUNT))


with BuildPart() as cirpattern3_6:
    # CirPattern3: pattern copy
    add(body_6.part.rotate(Axis((0, 0, 0), (0, 1, 0)), 6 * 360 / CIRPATTERN3_COUNT))


with BuildPart() as cirpattern3_7:
    # CirPattern3: pattern copy
    add(body_6.part.rotate(Axis((0, 0, 0), (0, 1, 0)), 7 * 360 / CIRPATTERN3_COUNT))


with BuildPart() as cirpattern3_8:
    # CirPattern3: pattern copy
    add(body_6.part.rotate(Axis((0, 0, 0), (0, 1, 0)), 8 * 360 / CIRPATTERN3_COUNT))


with BuildPart() as cirpattern3_9:
    # CirPattern3: pattern copy
    add(body_6.part.rotate(Axis((0, 0, 0), (0, 1, 0)), 9 * 360 / CIRPATTERN3_COUNT))


with BuildPart() as cirpattern3_10:
    # CirPattern3: pattern copy
    add(body_6.part.rotate(Axis((0, 0, 0), (0, 1, 0)), 10 * 360 / CIRPATTERN3_COUNT))


with BuildPart() as cirpattern3_11:
    # CirPattern3: pattern copy
    add(body_6.part.rotate(Axis((0, 0, 0), (0, 1, 0)), 11 * 360 / CIRPATTERN3_COUNT))


with BuildPart() as cirpattern3_12:
    # CirPattern3: pattern copy
    add(body_6.part.rotate(Axis((0, 0, 0), (0, 1, 0)), 12 * 360 / CIRPATTERN3_COUNT))


with BuildPart() as cirpattern3_13:
    # CirPattern3: pattern copy
    add(body_6.part.rotate(Axis((0, 0, 0), (0, 1, 0)), 13 * 360 / CIRPATTERN3_COUNT))


with BuildPart() as cirpattern3_14:
    # CirPattern3: pattern copy
    add(body_6.part.rotate(Axis((0, 0, 0), (0, 1, 0)), 14 * 360 / CIRPATTERN3_COUNT))


with BuildPart() as cirpattern3_15:
    # CirPattern3: pattern copy
    add(body_6.part.rotate(Axis((0, 0, 0), (0, 1, 0)), 15 * 360 / CIRPATTERN3_COUNT))


with BuildPart() as cirpattern3_16:
    # CirPattern3: pattern copy
    add(body_6.part.rotate(Axis((0, 0, 0), (0, 1, 0)), 16 * 360 / CIRPATTERN3_COUNT))


solid = Compound([body_2_1.part, body_6.part, cirpattern3_1.part, cirpattern3_2.part, cirpattern3_3.part, cirpattern3_4.part, cirpattern3_5.part, cirpattern3_6.part, cirpattern3_7.part, cirpattern3_8.part, cirpattern3_9.part, cirpattern3_10.part, cirpattern3_11.part, cirpattern3_12.part, cirpattern3_13.part, cirpattern3_14.part, cirpattern3_15.part, cirpattern3_16.part])
